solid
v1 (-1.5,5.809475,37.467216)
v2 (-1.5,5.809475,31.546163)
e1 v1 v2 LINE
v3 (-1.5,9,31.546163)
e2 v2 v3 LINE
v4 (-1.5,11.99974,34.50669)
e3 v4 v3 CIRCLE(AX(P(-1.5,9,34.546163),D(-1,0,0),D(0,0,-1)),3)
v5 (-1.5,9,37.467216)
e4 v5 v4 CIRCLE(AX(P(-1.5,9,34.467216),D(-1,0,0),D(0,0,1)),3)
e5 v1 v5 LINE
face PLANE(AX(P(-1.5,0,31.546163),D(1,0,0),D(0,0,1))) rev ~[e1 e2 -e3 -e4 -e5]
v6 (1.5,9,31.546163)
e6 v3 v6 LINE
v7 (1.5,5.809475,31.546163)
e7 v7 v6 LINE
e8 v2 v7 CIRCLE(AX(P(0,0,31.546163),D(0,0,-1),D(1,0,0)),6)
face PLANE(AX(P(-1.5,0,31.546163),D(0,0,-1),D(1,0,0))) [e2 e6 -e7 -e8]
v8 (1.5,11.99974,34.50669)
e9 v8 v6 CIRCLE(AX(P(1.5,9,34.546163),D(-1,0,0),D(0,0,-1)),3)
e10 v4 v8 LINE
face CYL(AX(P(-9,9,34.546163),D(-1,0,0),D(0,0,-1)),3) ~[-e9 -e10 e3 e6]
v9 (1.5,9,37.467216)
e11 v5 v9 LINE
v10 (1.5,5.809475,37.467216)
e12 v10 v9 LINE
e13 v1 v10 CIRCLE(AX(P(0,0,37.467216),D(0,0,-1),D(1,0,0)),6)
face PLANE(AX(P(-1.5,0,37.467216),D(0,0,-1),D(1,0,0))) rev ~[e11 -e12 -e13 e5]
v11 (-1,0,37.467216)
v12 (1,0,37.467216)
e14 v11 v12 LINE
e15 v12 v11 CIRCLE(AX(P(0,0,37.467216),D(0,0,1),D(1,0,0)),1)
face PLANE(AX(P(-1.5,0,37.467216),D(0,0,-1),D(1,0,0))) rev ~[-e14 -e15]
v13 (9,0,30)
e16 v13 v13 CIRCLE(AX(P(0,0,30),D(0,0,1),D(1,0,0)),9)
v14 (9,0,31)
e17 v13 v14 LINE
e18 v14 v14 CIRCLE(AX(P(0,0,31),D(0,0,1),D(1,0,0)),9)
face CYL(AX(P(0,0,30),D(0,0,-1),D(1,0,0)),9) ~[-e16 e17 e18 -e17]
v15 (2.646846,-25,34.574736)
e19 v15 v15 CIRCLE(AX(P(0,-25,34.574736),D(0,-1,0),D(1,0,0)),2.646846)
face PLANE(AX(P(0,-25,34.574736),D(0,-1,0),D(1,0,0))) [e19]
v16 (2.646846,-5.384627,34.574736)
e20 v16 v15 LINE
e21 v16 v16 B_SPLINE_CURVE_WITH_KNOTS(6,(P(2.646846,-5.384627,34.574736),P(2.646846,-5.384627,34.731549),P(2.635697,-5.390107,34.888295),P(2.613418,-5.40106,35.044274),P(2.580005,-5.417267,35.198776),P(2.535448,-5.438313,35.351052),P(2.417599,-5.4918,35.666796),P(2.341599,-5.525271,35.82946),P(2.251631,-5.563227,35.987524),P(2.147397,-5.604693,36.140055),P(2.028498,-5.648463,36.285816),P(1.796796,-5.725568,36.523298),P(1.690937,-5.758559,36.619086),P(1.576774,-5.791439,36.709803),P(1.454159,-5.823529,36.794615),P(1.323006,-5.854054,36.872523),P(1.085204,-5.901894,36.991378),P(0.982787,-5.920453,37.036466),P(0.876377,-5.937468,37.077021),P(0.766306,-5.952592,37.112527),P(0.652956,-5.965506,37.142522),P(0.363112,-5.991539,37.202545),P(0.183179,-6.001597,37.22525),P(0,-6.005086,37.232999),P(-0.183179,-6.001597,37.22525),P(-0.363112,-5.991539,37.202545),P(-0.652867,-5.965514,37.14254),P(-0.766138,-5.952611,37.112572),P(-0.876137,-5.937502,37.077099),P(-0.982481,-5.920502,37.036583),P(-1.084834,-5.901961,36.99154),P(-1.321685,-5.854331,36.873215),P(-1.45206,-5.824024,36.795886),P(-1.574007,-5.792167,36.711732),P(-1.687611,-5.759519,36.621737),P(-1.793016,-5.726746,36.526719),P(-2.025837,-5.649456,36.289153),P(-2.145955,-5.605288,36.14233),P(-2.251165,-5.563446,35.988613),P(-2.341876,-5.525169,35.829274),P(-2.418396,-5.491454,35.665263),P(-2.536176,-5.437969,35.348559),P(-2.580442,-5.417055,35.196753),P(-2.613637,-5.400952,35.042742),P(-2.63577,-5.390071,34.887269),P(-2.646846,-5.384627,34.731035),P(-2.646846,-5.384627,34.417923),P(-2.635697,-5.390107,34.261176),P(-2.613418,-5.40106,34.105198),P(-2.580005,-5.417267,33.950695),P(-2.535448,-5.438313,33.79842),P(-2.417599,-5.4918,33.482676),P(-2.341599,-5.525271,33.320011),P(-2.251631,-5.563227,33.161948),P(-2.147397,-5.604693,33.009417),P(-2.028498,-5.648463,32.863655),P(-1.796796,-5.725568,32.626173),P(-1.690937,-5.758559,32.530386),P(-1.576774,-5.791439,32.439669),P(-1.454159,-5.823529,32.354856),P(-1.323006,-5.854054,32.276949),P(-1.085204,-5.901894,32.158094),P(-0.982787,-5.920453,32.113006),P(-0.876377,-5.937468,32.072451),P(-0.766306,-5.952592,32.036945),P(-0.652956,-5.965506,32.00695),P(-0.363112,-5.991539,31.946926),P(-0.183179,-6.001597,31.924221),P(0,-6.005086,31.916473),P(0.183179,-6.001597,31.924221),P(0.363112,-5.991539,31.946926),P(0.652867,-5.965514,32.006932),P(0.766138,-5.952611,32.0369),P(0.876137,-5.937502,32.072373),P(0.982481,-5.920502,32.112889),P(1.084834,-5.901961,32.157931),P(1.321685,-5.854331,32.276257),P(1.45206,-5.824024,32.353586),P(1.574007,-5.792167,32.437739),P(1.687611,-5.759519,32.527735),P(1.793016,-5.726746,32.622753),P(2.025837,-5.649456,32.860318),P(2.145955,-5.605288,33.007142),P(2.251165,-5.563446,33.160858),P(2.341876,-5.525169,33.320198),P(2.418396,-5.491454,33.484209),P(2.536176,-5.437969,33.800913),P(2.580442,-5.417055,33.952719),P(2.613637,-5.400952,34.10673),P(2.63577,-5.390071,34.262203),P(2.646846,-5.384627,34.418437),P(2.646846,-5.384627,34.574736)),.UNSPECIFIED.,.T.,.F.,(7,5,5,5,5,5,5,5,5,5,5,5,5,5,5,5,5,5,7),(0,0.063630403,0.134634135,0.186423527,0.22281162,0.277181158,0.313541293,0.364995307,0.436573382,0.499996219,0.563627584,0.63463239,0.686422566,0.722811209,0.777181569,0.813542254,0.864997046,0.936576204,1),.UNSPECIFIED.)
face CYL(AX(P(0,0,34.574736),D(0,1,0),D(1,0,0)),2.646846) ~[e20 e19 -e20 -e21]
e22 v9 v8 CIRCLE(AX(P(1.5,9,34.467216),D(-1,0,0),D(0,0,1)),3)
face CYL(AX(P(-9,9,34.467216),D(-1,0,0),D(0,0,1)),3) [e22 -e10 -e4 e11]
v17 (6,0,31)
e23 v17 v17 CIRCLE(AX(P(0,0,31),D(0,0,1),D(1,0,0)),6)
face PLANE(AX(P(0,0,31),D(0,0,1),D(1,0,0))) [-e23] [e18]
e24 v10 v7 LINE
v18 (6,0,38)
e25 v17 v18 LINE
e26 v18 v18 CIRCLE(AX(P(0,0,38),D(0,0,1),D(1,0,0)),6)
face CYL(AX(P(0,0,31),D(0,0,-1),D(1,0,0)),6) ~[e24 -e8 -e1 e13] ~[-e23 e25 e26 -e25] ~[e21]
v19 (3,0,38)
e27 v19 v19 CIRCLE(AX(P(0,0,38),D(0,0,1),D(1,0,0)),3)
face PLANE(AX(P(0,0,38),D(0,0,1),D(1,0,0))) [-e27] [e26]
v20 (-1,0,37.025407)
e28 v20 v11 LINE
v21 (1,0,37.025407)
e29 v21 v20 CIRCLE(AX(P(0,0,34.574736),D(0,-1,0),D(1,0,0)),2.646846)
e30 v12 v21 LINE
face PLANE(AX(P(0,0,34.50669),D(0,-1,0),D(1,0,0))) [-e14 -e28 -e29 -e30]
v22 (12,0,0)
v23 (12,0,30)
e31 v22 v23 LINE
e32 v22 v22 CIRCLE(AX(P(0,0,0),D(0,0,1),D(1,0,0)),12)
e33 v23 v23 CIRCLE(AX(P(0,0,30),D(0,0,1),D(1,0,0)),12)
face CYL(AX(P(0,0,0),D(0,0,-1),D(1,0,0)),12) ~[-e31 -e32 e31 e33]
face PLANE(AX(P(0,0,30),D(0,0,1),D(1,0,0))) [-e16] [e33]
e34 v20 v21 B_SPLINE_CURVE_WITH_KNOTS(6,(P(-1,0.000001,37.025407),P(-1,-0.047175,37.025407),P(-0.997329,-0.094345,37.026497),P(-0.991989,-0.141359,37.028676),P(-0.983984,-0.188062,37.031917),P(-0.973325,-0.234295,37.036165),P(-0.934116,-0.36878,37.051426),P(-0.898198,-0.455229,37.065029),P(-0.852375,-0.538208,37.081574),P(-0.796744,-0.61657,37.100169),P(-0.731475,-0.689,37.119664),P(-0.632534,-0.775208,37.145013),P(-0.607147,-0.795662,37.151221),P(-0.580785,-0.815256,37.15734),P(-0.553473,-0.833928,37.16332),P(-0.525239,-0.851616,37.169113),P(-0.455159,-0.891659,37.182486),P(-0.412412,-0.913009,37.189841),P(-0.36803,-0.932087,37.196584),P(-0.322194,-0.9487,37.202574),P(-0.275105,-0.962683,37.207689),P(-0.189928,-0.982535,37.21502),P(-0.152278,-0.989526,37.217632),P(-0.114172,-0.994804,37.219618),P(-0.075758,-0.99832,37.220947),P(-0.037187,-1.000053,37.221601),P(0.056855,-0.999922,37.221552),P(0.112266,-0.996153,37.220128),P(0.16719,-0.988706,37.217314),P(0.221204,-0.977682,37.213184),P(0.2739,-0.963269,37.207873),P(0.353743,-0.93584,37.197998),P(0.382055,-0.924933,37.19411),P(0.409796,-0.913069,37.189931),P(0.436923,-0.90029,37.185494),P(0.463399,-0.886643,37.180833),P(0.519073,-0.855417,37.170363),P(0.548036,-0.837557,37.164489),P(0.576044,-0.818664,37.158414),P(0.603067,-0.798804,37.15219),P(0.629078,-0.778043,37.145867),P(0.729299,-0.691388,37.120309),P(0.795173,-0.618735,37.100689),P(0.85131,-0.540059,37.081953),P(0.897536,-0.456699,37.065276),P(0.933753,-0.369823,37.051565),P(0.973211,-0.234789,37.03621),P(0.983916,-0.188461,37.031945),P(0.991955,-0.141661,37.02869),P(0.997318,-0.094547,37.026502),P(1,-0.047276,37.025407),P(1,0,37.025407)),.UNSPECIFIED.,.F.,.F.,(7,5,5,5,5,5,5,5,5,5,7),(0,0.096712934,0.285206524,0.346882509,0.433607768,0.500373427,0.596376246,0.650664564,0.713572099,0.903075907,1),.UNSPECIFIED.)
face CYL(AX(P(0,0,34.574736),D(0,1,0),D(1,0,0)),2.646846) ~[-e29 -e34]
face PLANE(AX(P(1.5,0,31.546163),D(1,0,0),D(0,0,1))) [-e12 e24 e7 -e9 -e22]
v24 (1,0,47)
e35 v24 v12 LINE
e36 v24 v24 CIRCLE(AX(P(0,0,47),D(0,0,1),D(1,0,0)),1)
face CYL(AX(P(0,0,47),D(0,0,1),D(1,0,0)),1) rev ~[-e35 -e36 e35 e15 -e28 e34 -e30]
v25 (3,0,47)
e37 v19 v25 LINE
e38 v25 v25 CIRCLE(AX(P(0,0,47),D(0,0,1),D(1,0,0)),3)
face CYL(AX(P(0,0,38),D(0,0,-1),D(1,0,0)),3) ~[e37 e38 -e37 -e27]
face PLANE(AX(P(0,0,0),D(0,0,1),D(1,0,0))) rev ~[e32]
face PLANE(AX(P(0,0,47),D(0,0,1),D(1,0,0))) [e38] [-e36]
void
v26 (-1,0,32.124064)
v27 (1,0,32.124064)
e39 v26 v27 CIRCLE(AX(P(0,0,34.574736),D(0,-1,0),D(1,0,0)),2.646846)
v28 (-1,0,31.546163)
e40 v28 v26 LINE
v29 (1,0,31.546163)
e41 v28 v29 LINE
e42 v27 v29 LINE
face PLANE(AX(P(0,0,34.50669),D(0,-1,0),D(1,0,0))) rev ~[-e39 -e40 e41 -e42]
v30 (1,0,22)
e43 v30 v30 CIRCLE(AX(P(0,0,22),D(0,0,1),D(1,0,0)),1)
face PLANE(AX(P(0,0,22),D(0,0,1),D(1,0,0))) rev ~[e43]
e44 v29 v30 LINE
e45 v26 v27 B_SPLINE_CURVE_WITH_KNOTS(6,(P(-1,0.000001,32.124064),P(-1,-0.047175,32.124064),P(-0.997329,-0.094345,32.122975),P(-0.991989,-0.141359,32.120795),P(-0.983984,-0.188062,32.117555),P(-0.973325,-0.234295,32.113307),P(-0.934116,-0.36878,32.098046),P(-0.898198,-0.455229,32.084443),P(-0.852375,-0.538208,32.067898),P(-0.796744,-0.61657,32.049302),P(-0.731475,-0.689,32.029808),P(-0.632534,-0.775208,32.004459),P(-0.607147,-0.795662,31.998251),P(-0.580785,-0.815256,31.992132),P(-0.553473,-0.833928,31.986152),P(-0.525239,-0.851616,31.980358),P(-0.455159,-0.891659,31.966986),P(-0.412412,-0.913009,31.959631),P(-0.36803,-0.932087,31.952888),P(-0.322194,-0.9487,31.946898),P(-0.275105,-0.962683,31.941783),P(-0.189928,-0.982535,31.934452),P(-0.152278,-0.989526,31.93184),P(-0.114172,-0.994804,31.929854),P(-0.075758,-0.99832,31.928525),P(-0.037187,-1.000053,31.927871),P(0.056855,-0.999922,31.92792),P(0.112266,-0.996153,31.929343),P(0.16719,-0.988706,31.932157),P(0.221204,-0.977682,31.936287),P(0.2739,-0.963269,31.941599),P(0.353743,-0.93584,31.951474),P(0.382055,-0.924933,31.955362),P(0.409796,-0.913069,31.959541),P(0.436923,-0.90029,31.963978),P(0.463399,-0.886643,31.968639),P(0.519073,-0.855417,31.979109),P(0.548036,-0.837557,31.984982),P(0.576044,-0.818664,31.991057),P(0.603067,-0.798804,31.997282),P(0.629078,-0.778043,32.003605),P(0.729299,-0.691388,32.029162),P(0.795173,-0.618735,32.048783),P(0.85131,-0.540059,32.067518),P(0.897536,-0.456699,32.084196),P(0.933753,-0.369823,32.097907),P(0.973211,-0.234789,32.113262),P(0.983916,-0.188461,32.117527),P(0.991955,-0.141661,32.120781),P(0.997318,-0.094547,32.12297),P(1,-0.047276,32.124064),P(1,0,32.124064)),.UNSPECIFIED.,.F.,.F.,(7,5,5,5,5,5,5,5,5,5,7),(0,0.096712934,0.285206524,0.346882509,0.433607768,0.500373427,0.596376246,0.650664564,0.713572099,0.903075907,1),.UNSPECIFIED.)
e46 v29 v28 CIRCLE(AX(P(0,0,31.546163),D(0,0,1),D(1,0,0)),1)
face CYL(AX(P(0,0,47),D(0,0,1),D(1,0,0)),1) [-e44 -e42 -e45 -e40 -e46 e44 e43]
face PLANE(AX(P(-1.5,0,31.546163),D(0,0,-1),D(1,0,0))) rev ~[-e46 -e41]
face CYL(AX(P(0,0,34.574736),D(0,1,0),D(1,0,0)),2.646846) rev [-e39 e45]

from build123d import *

# Parameters (mm, degrees)
F0_R         = 12
F1_DEPTH     = 30
F2_R         = 9
F3_DEPTH     = 1
F4_R         = 6
F5_DEPTH     = 7
F6_R         = 3
F7_DEPTH     = 9
F8_R         = 1
F9_DEPTH     = 25
F10_R        = 2.6468455099
F11_DEPTH    = 25
F12_W        = 3
F12_H        = 5.9210534014
F13_DEPTH    = 12
F14_T1_DEPTH = 18


# Not quite as in the source:
# - a fillet or chamfer that OpenCascade refuses, or shapes differently, is made with other operations: its cross-section is extruded or revolved along the edge and cut away or added


with BuildPart() as f1:
    # F0 (on Top) → F1 (new body)
    with BuildSketch(Plane.XY):
        Circle(F0_R)
    extrude(amount=F1_DEPTH)

    # F2 (on face) → F3 (join)
    with BuildSketch(Plane.XY.offset(30)):
        Circle(F2_R)
    extrude(amount=F3_DEPTH)

    # F4 (on face) → F5 (join)
    with BuildSketch(Plane.XY.offset(31)):
        Circle(F4_R)
    extrude(amount=F5_DEPTH)

    # F6 (on face) → F7 (join)
    with BuildSketch(Plane.XY.offset(38)):
        Circle(F6_R)
    extrude(amount=F7_DEPTH)

    # F8 (on face) → F9 (cut)
    with BuildSketch(Plane.XY.offset(47)):
        Circle(F8_R)
    extrude(amount=-F9_DEPTH, mode=Mode.SUBTRACT)

    # F10 (on Front) → F11 (join)
    with BuildSketch(Plane.XZ):
        with Locations((0, 34.5747359097)):
            Circle(F10_R)
    extrude(amount=F11_DEPTH)

    # F12 (on Front) → F13 (join)
    with BuildSketch(Plane.XZ):
        with Locations((0, 34.5066897571)):
            Rectangle(F12_W, F12_H)
    extrude(amount=-F13_DEPTH)

    # F14: fillet of radius 3 on 2 edges, made by hand

    # F14_s2 → F14_t1 (cut)
    with BuildSketch(Plane.YZ.offset(-9)):
        with BuildLine():
            ThreePointArc((9, 37.4672164578), (11.1213203436, 36.5885368014), (12, 34.4672164578))
            Line((12, 34.4672164578), (12, 37.4672164578))
            Line((12, 37.4672164578), (9, 37.4672164578))
        make_face()
        with BuildLine():
            ThreePointArc((9, 31.5461630564), (11.1213203436, 32.4248427128), (12, 34.5461630564))
            Line((12, 34.5461630564), (12, 31.5461630564))
            Line((12, 31.5461630564), (9, 31.5461630564))
        make_face()
    extrude(amount=F14_T1_DEPTH, mode=Mode.SUBTRACT)


solid = f1.part
